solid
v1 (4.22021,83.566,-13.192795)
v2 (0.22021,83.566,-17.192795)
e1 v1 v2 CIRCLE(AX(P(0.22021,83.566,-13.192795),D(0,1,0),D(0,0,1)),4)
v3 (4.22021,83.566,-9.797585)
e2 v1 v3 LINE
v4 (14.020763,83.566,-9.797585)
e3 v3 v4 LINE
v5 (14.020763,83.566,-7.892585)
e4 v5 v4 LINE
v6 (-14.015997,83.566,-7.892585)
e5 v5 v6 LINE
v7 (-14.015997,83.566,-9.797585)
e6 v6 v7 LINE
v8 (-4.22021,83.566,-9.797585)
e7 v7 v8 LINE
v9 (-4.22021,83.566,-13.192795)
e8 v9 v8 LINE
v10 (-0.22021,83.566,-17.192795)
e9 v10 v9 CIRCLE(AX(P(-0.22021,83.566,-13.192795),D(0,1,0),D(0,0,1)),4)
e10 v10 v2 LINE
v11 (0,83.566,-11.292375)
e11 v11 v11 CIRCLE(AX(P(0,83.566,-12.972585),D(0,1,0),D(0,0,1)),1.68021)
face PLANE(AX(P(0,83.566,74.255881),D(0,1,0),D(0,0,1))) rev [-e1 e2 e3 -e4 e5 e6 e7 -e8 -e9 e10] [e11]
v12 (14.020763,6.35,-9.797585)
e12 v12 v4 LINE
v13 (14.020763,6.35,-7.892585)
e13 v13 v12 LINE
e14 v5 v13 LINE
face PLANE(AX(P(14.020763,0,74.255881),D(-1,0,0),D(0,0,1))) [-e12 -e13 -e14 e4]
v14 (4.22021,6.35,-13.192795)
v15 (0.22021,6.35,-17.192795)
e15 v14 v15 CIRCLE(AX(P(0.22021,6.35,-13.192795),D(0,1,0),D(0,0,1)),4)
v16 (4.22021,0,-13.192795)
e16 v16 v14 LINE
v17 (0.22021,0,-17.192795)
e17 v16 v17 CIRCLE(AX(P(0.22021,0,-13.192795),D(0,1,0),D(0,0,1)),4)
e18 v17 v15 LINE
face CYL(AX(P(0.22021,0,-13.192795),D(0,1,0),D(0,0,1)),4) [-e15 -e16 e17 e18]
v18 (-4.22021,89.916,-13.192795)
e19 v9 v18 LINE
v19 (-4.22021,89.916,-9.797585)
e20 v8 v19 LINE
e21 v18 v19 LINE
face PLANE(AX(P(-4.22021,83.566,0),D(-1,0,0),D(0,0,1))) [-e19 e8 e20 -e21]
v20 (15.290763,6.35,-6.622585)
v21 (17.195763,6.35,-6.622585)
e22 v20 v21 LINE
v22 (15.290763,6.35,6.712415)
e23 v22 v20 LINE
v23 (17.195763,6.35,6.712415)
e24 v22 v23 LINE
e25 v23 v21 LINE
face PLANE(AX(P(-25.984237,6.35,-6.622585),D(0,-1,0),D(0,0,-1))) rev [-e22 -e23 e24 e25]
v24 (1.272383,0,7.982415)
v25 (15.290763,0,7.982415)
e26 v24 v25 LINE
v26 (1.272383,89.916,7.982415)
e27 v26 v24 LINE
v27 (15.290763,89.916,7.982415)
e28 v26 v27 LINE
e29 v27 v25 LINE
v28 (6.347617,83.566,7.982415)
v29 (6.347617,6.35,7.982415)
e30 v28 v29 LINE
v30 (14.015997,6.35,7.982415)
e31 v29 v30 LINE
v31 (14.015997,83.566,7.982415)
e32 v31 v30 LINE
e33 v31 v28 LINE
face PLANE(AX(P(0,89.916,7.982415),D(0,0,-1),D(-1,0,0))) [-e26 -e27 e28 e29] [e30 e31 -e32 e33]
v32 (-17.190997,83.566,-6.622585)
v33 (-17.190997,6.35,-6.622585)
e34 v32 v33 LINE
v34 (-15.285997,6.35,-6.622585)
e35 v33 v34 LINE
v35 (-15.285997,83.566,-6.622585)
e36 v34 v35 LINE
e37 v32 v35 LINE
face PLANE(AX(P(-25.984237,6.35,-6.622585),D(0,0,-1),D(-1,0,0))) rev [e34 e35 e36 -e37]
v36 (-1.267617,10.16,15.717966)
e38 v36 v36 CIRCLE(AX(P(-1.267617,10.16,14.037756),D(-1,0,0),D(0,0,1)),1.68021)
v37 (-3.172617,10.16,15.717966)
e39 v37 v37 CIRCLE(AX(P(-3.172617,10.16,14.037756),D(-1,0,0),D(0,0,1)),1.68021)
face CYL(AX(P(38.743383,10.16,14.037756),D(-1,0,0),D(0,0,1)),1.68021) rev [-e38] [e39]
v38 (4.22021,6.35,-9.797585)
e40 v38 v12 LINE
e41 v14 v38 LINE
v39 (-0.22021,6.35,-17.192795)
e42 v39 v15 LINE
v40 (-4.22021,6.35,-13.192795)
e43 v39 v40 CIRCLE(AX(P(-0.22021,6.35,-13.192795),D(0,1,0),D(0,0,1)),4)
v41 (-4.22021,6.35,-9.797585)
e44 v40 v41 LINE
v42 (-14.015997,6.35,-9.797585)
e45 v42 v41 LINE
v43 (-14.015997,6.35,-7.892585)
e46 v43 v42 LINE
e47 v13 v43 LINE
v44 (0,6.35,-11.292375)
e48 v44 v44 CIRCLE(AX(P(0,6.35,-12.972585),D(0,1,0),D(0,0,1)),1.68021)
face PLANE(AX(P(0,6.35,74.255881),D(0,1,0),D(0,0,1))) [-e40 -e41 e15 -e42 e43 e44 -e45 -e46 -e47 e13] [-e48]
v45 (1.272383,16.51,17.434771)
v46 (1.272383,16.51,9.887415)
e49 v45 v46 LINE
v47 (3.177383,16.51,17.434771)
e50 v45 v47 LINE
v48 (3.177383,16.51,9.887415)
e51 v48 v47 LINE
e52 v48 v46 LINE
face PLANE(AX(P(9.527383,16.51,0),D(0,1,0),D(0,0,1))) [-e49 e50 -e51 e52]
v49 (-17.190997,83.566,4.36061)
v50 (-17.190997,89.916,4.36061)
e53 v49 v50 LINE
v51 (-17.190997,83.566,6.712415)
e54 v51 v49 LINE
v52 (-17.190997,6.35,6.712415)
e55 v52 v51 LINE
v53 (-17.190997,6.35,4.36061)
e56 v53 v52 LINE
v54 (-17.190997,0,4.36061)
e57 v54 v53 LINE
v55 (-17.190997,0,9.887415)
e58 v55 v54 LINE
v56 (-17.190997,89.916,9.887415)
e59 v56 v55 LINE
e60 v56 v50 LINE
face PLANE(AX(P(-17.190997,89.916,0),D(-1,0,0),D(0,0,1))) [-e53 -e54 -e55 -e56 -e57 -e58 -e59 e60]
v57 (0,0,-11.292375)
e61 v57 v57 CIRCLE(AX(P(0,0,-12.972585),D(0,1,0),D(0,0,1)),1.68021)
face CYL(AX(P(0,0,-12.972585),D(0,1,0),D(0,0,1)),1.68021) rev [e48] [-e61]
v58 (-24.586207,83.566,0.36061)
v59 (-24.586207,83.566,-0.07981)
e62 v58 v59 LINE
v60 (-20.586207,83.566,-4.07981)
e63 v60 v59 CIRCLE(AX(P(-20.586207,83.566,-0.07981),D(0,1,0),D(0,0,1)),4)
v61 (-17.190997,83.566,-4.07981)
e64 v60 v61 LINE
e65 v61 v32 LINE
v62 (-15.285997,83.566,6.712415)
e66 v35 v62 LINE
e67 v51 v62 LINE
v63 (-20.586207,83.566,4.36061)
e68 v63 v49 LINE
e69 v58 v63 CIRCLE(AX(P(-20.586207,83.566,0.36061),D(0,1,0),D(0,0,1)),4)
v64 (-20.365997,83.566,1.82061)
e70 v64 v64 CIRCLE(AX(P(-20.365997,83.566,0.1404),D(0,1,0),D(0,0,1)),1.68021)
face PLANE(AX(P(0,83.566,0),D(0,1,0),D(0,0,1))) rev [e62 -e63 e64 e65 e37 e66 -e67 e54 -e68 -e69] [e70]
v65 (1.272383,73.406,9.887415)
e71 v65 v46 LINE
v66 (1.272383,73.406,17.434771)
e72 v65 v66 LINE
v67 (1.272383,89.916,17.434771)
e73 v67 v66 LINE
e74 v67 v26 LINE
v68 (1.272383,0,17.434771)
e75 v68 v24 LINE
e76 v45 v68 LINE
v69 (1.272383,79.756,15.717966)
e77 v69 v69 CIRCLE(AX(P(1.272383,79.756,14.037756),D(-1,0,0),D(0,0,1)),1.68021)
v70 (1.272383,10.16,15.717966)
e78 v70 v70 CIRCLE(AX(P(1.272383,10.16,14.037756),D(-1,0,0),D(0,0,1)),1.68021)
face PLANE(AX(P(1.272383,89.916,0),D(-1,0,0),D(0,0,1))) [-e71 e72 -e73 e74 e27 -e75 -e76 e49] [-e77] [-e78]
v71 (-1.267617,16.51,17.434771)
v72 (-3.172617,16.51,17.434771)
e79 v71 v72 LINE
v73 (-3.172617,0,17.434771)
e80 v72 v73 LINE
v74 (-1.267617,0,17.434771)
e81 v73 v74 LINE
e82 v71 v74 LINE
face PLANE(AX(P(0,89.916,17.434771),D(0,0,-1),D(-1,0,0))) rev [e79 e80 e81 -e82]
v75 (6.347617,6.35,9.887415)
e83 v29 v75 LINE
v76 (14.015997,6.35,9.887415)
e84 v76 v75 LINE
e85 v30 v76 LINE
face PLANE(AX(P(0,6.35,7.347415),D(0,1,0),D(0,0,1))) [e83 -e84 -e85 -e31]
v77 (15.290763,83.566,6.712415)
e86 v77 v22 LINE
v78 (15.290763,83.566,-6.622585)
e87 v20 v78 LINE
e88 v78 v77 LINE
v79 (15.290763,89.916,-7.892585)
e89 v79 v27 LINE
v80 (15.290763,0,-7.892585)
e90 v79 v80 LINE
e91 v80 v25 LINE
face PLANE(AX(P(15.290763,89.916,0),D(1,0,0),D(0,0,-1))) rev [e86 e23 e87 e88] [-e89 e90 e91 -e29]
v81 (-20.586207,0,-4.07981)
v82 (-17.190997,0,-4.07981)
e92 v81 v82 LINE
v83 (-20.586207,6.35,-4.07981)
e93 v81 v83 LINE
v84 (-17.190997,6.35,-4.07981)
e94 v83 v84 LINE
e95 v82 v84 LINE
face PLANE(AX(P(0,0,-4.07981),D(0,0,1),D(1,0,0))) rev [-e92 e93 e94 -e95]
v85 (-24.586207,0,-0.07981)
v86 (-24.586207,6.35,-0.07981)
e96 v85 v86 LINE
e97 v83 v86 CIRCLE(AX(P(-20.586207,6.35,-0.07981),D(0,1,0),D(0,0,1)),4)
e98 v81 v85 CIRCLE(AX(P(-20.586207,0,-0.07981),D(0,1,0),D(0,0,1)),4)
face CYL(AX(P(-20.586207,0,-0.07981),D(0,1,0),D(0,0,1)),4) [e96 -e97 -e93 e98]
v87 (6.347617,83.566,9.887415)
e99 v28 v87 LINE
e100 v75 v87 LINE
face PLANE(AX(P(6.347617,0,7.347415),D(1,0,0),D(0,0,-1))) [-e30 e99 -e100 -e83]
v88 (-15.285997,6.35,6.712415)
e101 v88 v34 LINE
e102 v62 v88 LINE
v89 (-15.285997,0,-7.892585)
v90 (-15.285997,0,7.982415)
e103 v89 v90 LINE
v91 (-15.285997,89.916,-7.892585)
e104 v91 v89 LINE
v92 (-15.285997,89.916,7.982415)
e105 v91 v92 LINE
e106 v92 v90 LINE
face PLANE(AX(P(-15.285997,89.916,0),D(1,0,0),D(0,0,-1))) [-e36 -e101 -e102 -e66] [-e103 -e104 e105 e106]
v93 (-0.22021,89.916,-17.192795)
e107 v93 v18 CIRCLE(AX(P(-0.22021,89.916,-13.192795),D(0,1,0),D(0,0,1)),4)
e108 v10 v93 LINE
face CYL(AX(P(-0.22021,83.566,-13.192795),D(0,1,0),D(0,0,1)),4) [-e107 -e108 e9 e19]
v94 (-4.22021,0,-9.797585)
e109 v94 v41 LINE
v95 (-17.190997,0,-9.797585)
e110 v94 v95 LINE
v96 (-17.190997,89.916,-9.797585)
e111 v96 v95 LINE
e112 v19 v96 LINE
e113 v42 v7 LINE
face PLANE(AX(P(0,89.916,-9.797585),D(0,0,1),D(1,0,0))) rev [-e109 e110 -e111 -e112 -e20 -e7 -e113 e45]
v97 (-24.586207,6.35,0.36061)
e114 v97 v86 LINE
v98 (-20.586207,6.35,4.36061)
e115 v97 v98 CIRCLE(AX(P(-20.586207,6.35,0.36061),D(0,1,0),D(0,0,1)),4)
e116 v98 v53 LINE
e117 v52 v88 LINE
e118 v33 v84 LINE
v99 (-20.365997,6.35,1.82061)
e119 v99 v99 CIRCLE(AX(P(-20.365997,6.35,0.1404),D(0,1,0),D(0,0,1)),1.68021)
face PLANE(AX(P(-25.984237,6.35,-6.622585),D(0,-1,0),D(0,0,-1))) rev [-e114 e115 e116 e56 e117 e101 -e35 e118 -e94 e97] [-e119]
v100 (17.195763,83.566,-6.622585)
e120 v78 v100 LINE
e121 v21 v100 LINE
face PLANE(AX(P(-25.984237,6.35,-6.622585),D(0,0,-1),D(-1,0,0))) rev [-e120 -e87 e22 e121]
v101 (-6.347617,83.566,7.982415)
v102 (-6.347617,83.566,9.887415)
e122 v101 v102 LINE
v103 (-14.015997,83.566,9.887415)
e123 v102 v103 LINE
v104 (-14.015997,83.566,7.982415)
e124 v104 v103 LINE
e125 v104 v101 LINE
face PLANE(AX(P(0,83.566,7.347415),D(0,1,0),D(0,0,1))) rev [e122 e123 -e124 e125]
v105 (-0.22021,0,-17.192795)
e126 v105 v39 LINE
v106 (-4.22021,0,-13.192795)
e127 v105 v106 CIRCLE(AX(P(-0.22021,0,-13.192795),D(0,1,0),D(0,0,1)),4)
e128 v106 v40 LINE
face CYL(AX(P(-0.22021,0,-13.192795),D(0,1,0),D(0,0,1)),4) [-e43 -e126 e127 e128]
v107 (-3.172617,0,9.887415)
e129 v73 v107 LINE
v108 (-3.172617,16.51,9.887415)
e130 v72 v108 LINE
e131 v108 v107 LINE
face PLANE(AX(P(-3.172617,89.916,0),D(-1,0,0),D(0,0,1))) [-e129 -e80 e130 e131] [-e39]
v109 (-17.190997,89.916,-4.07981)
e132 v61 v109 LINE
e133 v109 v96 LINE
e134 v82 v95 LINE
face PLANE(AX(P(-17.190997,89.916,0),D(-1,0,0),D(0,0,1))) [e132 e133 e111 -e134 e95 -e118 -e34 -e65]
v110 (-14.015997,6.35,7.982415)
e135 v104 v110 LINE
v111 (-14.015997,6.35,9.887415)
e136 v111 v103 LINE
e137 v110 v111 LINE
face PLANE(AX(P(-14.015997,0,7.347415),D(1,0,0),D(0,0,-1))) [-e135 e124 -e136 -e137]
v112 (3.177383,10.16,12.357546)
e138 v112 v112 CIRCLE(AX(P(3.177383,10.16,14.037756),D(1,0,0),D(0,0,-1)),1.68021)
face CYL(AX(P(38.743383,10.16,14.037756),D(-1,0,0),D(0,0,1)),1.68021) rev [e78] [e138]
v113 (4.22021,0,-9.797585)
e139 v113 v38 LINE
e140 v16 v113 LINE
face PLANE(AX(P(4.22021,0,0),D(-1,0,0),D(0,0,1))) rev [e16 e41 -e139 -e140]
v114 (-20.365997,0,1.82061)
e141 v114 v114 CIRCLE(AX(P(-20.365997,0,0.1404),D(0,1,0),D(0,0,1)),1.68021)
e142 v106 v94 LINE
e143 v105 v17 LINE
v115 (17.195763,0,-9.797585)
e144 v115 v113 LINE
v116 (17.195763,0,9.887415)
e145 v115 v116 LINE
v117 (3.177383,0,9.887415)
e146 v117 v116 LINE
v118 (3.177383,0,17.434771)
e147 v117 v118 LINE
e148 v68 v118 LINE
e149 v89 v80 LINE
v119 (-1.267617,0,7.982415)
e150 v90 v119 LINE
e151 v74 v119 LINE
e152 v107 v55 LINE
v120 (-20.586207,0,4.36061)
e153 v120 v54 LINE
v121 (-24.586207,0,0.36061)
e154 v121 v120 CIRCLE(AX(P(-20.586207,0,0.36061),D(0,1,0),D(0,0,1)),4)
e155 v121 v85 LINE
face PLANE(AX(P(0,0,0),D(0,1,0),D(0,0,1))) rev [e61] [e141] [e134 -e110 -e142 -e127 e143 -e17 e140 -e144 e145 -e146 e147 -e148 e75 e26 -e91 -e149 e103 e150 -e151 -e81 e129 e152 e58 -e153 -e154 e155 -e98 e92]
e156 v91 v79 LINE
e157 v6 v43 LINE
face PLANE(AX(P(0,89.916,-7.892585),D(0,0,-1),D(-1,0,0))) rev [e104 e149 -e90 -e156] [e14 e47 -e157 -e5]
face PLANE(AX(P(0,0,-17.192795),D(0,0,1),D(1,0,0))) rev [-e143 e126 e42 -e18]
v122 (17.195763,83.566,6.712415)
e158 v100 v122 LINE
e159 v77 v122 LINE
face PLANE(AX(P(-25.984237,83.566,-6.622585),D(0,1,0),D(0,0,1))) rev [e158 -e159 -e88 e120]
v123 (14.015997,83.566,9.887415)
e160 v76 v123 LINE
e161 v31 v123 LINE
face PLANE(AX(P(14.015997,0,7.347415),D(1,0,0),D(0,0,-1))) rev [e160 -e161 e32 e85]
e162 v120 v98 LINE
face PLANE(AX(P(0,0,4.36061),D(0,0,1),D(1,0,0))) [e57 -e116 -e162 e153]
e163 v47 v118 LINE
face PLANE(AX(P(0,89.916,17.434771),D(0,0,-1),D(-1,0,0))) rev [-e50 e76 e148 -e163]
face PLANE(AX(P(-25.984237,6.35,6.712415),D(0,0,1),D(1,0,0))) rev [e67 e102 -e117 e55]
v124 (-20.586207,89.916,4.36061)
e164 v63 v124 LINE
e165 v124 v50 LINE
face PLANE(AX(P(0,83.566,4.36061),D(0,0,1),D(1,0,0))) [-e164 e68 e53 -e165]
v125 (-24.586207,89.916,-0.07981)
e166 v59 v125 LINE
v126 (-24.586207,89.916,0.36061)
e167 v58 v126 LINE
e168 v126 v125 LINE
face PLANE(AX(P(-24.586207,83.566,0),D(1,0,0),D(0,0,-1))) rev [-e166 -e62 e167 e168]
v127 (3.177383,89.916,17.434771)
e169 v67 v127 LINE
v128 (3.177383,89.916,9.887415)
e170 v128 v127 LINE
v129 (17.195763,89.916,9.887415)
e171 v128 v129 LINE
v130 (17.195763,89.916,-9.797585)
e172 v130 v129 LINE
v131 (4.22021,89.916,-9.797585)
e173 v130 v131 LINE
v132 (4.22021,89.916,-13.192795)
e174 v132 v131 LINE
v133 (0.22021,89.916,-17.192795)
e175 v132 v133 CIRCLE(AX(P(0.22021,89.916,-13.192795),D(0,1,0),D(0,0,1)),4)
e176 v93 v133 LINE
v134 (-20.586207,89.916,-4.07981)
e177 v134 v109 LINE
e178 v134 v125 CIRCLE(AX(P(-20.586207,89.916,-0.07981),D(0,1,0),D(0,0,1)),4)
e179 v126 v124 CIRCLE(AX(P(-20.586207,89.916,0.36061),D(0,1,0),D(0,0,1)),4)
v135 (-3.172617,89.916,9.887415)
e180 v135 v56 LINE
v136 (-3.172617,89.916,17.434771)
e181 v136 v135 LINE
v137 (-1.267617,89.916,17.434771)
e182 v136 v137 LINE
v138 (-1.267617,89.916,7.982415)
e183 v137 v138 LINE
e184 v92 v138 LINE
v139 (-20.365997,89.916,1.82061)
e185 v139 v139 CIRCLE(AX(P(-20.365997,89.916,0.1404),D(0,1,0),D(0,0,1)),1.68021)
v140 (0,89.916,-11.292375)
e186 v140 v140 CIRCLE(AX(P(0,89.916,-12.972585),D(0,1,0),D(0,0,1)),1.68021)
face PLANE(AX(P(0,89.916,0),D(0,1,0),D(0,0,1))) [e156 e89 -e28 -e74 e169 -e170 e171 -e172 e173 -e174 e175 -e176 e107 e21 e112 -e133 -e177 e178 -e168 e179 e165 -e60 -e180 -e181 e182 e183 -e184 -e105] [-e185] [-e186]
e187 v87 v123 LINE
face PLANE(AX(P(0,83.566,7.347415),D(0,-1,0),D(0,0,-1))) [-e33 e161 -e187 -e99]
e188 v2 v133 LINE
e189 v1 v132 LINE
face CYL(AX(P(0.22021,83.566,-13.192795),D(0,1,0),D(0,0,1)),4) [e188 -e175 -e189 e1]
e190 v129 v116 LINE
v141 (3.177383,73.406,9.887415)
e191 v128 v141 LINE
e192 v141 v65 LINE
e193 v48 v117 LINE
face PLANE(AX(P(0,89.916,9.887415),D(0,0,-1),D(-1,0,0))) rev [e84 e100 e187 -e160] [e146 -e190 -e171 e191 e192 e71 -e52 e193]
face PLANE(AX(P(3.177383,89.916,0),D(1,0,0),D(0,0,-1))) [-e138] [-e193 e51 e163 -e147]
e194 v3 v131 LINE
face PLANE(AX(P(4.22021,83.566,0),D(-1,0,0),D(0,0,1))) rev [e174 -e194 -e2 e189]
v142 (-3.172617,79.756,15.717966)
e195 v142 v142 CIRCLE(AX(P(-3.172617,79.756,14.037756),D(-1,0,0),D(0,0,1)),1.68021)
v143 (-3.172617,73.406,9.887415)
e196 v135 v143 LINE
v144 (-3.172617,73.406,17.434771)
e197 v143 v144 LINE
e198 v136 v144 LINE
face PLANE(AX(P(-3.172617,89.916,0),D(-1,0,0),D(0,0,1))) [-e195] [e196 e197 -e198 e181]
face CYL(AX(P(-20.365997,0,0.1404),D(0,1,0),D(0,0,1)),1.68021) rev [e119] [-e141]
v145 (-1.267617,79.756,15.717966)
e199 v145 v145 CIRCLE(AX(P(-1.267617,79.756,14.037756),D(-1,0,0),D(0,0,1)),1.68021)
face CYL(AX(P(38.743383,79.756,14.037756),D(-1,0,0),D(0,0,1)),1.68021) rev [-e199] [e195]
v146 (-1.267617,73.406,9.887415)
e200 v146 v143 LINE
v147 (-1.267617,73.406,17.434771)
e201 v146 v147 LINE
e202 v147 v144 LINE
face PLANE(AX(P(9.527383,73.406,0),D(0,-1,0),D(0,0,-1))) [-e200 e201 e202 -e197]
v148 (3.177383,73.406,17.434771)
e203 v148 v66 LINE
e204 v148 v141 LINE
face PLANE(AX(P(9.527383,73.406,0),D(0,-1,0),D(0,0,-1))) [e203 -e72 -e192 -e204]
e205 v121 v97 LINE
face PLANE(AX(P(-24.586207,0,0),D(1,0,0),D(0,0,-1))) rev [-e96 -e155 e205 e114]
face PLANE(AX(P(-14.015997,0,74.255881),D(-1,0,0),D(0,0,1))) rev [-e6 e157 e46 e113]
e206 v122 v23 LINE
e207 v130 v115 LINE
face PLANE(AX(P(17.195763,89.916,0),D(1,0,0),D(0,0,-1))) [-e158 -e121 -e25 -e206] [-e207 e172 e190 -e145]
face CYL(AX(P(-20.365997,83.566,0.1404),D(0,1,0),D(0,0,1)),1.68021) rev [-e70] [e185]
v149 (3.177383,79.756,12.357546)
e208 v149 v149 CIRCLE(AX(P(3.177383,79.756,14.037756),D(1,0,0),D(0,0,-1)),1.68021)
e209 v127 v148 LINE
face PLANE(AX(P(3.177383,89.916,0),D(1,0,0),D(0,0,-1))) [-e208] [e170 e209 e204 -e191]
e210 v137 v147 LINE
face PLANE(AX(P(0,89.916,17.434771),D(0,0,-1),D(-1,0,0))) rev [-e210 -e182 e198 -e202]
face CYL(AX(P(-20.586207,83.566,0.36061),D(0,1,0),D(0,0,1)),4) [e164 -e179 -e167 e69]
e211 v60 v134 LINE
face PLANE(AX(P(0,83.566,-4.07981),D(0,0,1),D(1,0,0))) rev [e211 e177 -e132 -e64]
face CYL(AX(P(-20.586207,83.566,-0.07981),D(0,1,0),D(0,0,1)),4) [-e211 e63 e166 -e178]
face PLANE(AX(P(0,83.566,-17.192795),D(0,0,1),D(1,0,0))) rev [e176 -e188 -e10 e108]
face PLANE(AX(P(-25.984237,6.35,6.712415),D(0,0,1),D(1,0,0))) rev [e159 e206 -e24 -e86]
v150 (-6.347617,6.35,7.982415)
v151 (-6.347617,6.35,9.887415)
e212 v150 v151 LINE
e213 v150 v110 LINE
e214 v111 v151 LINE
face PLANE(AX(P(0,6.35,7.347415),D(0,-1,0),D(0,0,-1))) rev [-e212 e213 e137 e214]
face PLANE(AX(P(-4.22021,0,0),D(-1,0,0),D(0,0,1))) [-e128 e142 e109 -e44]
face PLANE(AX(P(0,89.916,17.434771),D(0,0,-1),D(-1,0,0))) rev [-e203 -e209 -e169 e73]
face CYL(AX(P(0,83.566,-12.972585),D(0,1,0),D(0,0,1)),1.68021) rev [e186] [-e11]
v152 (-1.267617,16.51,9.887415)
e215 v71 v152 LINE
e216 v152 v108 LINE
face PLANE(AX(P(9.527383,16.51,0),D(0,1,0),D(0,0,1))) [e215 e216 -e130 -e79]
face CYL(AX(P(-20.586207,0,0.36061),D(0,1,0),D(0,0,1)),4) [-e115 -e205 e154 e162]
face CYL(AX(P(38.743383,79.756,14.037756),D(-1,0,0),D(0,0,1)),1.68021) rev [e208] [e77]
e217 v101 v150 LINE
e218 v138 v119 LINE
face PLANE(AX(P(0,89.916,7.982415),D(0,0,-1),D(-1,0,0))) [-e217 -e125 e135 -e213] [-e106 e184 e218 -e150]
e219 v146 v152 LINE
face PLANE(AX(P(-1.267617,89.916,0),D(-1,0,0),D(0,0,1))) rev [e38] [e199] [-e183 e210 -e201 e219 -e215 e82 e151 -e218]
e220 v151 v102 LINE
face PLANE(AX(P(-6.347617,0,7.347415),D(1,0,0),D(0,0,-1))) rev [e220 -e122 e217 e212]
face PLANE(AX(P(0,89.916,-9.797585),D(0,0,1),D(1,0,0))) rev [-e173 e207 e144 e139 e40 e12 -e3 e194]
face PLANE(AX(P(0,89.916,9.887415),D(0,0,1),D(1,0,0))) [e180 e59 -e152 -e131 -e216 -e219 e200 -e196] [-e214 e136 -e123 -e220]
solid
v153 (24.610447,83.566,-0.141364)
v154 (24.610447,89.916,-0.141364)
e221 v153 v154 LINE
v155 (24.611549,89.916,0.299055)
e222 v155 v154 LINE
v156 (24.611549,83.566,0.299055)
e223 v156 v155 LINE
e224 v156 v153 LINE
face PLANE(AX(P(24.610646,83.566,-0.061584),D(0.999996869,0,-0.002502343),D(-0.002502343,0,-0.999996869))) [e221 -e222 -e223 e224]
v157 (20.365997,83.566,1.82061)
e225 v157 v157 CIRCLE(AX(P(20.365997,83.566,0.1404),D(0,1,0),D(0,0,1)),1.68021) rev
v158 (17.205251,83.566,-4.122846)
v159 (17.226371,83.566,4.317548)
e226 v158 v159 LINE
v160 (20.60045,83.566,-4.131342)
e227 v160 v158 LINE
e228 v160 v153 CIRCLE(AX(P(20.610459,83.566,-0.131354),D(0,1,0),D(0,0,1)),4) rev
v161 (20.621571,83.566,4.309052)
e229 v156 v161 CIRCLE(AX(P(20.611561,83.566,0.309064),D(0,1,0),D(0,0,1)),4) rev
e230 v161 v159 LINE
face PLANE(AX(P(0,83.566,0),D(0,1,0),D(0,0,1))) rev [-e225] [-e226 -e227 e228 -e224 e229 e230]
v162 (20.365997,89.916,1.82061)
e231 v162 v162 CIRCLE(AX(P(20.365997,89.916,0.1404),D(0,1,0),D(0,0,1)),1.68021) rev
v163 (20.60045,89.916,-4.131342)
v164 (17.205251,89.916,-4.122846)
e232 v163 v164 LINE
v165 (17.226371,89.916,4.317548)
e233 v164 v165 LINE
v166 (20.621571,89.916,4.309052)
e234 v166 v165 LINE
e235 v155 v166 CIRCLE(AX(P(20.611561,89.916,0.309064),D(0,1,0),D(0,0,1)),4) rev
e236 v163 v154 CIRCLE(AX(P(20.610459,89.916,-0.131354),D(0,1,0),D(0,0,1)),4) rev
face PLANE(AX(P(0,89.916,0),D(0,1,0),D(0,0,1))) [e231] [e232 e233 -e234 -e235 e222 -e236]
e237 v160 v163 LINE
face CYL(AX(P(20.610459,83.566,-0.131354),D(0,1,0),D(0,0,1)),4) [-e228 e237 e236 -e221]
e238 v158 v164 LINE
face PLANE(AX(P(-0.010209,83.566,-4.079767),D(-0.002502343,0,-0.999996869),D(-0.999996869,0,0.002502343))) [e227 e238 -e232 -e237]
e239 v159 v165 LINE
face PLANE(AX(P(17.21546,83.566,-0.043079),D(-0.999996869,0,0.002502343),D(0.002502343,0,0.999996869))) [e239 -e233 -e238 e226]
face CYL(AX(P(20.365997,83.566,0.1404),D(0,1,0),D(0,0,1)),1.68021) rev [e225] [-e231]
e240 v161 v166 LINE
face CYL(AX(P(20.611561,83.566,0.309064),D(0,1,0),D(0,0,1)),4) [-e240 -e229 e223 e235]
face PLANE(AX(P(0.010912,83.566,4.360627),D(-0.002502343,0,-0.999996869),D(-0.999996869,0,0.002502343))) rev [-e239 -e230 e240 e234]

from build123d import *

# Parameters (mm, degrees)
BOSS_EXTRUDE1_DEPTH = 89.916
SKETCH2_W           = 28.036759992
SKETCH2_H           = 77.216
CUT_EXTRUDE1_DEPTH  = 1.905
SKETCH4_R           = 1.68021
CUT_EXTRUDE2_DEPTH  = 41.916
SKETCH5_R           = 1.68021
BOSS_EXTRUDE2_DEPTH = 6.35
SKETCH6_W           = 7.668379996
SKETCH6_H           = 77.216
CUT_EXTRUDE3_DEPTH  = 2.54
CUT_EXTRUDE4_DEPTH  = 12.7
SKETCH8_W           = 13.335
SKETCH8_H           = 77.216
CUT_EXTRUDE5_DEPTH  = 43.18
LPATTERN1_OUTLINE_R = 1.68021
LPATTERN1_DEPTH     = 6.35


# Read off the part's stored shape, not the designer's step: LPattern1
with BuildPart() as part:
    # Sketch1 → Boss-Extrude1 (new body)
    with BuildSketch(Plane(origin=(0, 0, 0), x_dir=(1, 0, 0), z_dir=(0, 1, 0))):
        Polygon((-15.28599651, -7.274771053), (-15.28599651, -0.044914733), (-15.28599651, 7.184941588), (-15.28599651, 7.892585267), (15.290763482, 7.892585267), (15.290763482, 7.184941588), (15.290763482, -7.274771053), (15.290763482, -7.982414733), (1.272383486, -7.982414733), (1.272383486, -17.434771053), (3.177383486, -17.434771053), (3.177383486, -9.887414733), (17.195763482, -9.887414733), (17.195763482, -7.982414733), (17.195763482, 9.797585267), (-15.28599651, 9.797585267), (-17.19099651, 9.797585267), (-17.19099651, -9.887414733), (-3.172616514, -9.887414733), (-3.172616514, -10.640741484), (-3.172616514, -17.434771053), (-1.267616514, -17.434771053), (-1.267616514, -7.982414733), (-15.28599651, -7.982414733), align=None)
    extrude(amount=BOSS_EXTRUDE1_DEPTH)

    # Sketch2 → Cut-Extrude1 (cut)
    with BuildSketch(Plane(origin=(0, 0, -9.797585267), x_dir=(-1, 0, 0), z_dir=(0, 0, -1))):
        with Locations((-0.002383486, 44.958)):
            Rectangle(SKETCH2_W, SKETCH2_H)
    extrude(amount=-CUT_EXTRUDE1_DEPTH, mode=Mode.SUBTRACT)

    # Sketch4 → Cut-Extrude2 (cut)
    with BuildSketch(Plane.ZY.offset(3.172616514)):
        with Locations((14.037756268, 10.16)):
            Circle(SKETCH4_R)
        with Locations((14.037756268, 79.756)):
            Circle(SKETCH4_R)
    extrude(amount=-CUT_EXTRUDE2_DEPTH, mode=Mode.SUBTRACT)

    # Sketch5 → Boss-Extrude2 (add)
    # profile 1 of 3: a face of its own
    with BuildSketch(Plane(origin=(0, 89.916, 0), x_dir=(1, 0, 0), z_dir=(0, 1, 0))):
        with BuildLine():
            Line((-24.58620651, 0.079810052), (-24.58620651, -0.360609948))
            ThreePointArc((-24.58620651, -0.360609948), (-23.414633635, -3.189037073), (-20.58620651, -4.360609948))
            Line((-20.58620651, -4.360609948), (-17.19099651, -4.360609948))
            Line((-17.19099651, -4.360609948), (-17.19099651, 4.079810052))
            Line((-17.19099651, 4.079810052), (-20.58620651, 4.079810052))
            ThreePointArc((-20.58620651, 4.079810052), (-23.414633635, 2.908237176), (-24.58620651, 0.079810052))
        make_face()
        with Locations(Location((-20.36599651, -0.140399948, 0), (0, 0, 270))):
            Circle(SKETCH5_R, mode=Mode.SUBTRACT)
    # profile 2 of 3: a face of its own
    with BuildSketch(Plane(origin=(0, 89.916, 0), x_dir=(1, 0, 0), z_dir=(0, 1, 0))):
        with BuildLine():
            Line((-4.22021, 13.192795267), (-4.22021, 9.797585267))
            Line((-4.22021, 9.797585267), (4.22021, 9.797585267))
            Line((4.22021, 9.797585267), (4.22021, 13.192795267))
            ThreePointArc((4.22021, 13.192795267), (3.048637125, 16.021222392), (0.22021, 17.192795267))
            Line((0.22021, 17.192795267), (-0.22021, 17.192795267))
            ThreePointArc((-0.22021, 17.192795267), (-3.048637125, 16.021222392), (-4.22021, 13.192795267))
        make_face()
        with Locations(Location((0, 12.972585267, 0), (0, 0, 270))):
            Circle(SKETCH5_R, mode=Mode.SUBTRACT)
    # profile 3 of 3: a face of its own
    with BuildSketch(Plane(origin=(0, 89.916, 0), x_dir=(1, 0, 0), z_dir=(0, 1, 0))):
        with BuildLine():
            ThreePointArc((20.600449894, 4.13134171), (23.431799841, 2.966850199), (24.610446744, 0.141363607))
            Line((24.610446744, 0.141363607), (24.611548826, -0.299055014))
            ThreePointArc((24.611548826, -0.299055014), (23.447057315, -3.130404961), (20.621570723, -4.309051864))
            Line((20.621570723, -4.309051864), (17.226371353, -4.317547845))
            Line((17.226371353, -4.317547845), (17.205250524, 4.122845729))
            Line((17.205250524, 4.122845729), (20.600449894, 4.13134171))
        make_face()
        with Locations(Location((20.36599651, -0.140399948, 0), (0, 0, 270))):
            Circle(SKETCH5_R, mode=Mode.SUBTRACT)
    extrude(amount=-BOSS_EXTRUDE2_DEPTH)


with BuildPart() as boss_extrude2_piece_1:
    # of the separate pieces the step leaves, piece 1, a body of its own (boss_extrude2_pieces)
    add(part.part.solids().sort_by_distance((-17.19099651, 0, -9.797585267))[0])

    # Sketch6 → Cut-Extrude3 (cut)
    with BuildSketch(Plane.XY.offset(9.887414733)):
        with Locations((-10.181806512, 44.958)):
            Rectangle(SKETCH6_W, SKETCH6_H)
    cut_extrude3 = extrude(amount=-CUT_EXTRUDE3_DEPTH, mode=Mode.SUBTRACT)

    # Mirror1: Cut-Extrude3 across plane
    add(cut_extrude3.mirror(Plane(origin=(0, 0, 0), x_dir=(0, 0, 1), z_dir=(1, 0, 0))), mode=Mode.SUBTRACT)

    # Sketch7 → Cut-Extrude4 (cut)
    with BuildSketch(Plane.ZY.offset(3.172616514)):
        Polygon((17.434771053, 73.406), (14.037756268, 73.406), (9.887414733, 73.406), (9.887414733, 16.51), (14.037756268, 16.51), (17.434771053, 16.51), align=None)
    extrude(amount=-CUT_EXTRUDE4_DEPTH, mode=Mode.SUBTRACT)

    # Sketch8 → Cut-Extrude5 (cut)
    with BuildSketch(Plane(origin=(17.195763482, 0, 0), x_dir=(0, 0, -1), z_dir=(1, 0, 0))):
        with Locations((-0.044914733, 44.958)):
            Rectangle(SKETCH8_W, SKETCH8_H)
    extrude(amount=-CUT_EXTRUDE5_DEPTH, mode=Mode.SUBTRACT)

    # LPattern1 outline → LPattern1 (add)
    # profile 1 of 2: a face of its own
    with BuildSketch(Plane(origin=(0, 0, 0), x_dir=(1, 0, 0), z_dir=(0, 1, 0))):
        with BuildLine():
            Line((-4.22021, 13.192795267), (-4.22021, 9.797585267))
            Line((-4.22021, 9.797585267), (4.22021, 9.797585267))
            Line((4.22021, 9.797585267), (4.22021, 13.192795267))
            ThreePointArc((4.22021, 13.192795267), (3.048637125, 16.021222392), (0.22021, 17.192795267))
            Line((0.22021, 17.192795267), (-0.22021, 17.192795267))
            ThreePointArc((-0.22021, 17.192795267), (-3.048637125, 16.021222392), (-4.22021, 13.192795267))
        make_face()
        with Locations((0, 12.972585267)):
            Circle(LPATTERN1_OUTLINE_R, mode=Mode.SUBTRACT)
    # profile 2 of 2: a face of its own
    with BuildSketch(Plane(origin=(0, 0, 0), x_dir=(1, 0, 0), z_dir=(0, 1, 0))):
        with BuildLine():
            Line((-17.19099651, 4.079810052), (-20.58620651, 4.079810052))
            ThreePointArc((-20.58620651, 4.079810052), (-23.414633634, 2.908237177), (-24.58620651, 0.079810052))
            Line((-24.58620651, 0.079810052), (-24.58620651, -0.360609948))
            ThreePointArc((-24.58620651, -0.360609948), (-23.414633635, -3.189037073), (-20.58620651, -4.360609948))
            Line((-20.58620651, -4.360609948), (-17.19099651, -4.360609948))
            Line((-17.19099651, -4.360609948), (-17.19099651, 4.079810052))
        make_face()
        with Locations((-20.36599651, -0.140399948)):
            Circle(LPATTERN1_OUTLINE_R, mode=Mode.SUBTRACT)
    extrude(amount=LPATTERN1_DEPTH)


with BuildPart() as boss_extrude2_piece_2:
    # of the separate pieces the step leaves, piece 2, a body of its own (boss_extrude2_pieces)
    add(part.part.solids().sort_by_distance((20.600449894, 89.916, -4.13134171))[0])


solid = Compound([boss_extrude2_piece_1.part, boss_extrude2_piece_2.part])
